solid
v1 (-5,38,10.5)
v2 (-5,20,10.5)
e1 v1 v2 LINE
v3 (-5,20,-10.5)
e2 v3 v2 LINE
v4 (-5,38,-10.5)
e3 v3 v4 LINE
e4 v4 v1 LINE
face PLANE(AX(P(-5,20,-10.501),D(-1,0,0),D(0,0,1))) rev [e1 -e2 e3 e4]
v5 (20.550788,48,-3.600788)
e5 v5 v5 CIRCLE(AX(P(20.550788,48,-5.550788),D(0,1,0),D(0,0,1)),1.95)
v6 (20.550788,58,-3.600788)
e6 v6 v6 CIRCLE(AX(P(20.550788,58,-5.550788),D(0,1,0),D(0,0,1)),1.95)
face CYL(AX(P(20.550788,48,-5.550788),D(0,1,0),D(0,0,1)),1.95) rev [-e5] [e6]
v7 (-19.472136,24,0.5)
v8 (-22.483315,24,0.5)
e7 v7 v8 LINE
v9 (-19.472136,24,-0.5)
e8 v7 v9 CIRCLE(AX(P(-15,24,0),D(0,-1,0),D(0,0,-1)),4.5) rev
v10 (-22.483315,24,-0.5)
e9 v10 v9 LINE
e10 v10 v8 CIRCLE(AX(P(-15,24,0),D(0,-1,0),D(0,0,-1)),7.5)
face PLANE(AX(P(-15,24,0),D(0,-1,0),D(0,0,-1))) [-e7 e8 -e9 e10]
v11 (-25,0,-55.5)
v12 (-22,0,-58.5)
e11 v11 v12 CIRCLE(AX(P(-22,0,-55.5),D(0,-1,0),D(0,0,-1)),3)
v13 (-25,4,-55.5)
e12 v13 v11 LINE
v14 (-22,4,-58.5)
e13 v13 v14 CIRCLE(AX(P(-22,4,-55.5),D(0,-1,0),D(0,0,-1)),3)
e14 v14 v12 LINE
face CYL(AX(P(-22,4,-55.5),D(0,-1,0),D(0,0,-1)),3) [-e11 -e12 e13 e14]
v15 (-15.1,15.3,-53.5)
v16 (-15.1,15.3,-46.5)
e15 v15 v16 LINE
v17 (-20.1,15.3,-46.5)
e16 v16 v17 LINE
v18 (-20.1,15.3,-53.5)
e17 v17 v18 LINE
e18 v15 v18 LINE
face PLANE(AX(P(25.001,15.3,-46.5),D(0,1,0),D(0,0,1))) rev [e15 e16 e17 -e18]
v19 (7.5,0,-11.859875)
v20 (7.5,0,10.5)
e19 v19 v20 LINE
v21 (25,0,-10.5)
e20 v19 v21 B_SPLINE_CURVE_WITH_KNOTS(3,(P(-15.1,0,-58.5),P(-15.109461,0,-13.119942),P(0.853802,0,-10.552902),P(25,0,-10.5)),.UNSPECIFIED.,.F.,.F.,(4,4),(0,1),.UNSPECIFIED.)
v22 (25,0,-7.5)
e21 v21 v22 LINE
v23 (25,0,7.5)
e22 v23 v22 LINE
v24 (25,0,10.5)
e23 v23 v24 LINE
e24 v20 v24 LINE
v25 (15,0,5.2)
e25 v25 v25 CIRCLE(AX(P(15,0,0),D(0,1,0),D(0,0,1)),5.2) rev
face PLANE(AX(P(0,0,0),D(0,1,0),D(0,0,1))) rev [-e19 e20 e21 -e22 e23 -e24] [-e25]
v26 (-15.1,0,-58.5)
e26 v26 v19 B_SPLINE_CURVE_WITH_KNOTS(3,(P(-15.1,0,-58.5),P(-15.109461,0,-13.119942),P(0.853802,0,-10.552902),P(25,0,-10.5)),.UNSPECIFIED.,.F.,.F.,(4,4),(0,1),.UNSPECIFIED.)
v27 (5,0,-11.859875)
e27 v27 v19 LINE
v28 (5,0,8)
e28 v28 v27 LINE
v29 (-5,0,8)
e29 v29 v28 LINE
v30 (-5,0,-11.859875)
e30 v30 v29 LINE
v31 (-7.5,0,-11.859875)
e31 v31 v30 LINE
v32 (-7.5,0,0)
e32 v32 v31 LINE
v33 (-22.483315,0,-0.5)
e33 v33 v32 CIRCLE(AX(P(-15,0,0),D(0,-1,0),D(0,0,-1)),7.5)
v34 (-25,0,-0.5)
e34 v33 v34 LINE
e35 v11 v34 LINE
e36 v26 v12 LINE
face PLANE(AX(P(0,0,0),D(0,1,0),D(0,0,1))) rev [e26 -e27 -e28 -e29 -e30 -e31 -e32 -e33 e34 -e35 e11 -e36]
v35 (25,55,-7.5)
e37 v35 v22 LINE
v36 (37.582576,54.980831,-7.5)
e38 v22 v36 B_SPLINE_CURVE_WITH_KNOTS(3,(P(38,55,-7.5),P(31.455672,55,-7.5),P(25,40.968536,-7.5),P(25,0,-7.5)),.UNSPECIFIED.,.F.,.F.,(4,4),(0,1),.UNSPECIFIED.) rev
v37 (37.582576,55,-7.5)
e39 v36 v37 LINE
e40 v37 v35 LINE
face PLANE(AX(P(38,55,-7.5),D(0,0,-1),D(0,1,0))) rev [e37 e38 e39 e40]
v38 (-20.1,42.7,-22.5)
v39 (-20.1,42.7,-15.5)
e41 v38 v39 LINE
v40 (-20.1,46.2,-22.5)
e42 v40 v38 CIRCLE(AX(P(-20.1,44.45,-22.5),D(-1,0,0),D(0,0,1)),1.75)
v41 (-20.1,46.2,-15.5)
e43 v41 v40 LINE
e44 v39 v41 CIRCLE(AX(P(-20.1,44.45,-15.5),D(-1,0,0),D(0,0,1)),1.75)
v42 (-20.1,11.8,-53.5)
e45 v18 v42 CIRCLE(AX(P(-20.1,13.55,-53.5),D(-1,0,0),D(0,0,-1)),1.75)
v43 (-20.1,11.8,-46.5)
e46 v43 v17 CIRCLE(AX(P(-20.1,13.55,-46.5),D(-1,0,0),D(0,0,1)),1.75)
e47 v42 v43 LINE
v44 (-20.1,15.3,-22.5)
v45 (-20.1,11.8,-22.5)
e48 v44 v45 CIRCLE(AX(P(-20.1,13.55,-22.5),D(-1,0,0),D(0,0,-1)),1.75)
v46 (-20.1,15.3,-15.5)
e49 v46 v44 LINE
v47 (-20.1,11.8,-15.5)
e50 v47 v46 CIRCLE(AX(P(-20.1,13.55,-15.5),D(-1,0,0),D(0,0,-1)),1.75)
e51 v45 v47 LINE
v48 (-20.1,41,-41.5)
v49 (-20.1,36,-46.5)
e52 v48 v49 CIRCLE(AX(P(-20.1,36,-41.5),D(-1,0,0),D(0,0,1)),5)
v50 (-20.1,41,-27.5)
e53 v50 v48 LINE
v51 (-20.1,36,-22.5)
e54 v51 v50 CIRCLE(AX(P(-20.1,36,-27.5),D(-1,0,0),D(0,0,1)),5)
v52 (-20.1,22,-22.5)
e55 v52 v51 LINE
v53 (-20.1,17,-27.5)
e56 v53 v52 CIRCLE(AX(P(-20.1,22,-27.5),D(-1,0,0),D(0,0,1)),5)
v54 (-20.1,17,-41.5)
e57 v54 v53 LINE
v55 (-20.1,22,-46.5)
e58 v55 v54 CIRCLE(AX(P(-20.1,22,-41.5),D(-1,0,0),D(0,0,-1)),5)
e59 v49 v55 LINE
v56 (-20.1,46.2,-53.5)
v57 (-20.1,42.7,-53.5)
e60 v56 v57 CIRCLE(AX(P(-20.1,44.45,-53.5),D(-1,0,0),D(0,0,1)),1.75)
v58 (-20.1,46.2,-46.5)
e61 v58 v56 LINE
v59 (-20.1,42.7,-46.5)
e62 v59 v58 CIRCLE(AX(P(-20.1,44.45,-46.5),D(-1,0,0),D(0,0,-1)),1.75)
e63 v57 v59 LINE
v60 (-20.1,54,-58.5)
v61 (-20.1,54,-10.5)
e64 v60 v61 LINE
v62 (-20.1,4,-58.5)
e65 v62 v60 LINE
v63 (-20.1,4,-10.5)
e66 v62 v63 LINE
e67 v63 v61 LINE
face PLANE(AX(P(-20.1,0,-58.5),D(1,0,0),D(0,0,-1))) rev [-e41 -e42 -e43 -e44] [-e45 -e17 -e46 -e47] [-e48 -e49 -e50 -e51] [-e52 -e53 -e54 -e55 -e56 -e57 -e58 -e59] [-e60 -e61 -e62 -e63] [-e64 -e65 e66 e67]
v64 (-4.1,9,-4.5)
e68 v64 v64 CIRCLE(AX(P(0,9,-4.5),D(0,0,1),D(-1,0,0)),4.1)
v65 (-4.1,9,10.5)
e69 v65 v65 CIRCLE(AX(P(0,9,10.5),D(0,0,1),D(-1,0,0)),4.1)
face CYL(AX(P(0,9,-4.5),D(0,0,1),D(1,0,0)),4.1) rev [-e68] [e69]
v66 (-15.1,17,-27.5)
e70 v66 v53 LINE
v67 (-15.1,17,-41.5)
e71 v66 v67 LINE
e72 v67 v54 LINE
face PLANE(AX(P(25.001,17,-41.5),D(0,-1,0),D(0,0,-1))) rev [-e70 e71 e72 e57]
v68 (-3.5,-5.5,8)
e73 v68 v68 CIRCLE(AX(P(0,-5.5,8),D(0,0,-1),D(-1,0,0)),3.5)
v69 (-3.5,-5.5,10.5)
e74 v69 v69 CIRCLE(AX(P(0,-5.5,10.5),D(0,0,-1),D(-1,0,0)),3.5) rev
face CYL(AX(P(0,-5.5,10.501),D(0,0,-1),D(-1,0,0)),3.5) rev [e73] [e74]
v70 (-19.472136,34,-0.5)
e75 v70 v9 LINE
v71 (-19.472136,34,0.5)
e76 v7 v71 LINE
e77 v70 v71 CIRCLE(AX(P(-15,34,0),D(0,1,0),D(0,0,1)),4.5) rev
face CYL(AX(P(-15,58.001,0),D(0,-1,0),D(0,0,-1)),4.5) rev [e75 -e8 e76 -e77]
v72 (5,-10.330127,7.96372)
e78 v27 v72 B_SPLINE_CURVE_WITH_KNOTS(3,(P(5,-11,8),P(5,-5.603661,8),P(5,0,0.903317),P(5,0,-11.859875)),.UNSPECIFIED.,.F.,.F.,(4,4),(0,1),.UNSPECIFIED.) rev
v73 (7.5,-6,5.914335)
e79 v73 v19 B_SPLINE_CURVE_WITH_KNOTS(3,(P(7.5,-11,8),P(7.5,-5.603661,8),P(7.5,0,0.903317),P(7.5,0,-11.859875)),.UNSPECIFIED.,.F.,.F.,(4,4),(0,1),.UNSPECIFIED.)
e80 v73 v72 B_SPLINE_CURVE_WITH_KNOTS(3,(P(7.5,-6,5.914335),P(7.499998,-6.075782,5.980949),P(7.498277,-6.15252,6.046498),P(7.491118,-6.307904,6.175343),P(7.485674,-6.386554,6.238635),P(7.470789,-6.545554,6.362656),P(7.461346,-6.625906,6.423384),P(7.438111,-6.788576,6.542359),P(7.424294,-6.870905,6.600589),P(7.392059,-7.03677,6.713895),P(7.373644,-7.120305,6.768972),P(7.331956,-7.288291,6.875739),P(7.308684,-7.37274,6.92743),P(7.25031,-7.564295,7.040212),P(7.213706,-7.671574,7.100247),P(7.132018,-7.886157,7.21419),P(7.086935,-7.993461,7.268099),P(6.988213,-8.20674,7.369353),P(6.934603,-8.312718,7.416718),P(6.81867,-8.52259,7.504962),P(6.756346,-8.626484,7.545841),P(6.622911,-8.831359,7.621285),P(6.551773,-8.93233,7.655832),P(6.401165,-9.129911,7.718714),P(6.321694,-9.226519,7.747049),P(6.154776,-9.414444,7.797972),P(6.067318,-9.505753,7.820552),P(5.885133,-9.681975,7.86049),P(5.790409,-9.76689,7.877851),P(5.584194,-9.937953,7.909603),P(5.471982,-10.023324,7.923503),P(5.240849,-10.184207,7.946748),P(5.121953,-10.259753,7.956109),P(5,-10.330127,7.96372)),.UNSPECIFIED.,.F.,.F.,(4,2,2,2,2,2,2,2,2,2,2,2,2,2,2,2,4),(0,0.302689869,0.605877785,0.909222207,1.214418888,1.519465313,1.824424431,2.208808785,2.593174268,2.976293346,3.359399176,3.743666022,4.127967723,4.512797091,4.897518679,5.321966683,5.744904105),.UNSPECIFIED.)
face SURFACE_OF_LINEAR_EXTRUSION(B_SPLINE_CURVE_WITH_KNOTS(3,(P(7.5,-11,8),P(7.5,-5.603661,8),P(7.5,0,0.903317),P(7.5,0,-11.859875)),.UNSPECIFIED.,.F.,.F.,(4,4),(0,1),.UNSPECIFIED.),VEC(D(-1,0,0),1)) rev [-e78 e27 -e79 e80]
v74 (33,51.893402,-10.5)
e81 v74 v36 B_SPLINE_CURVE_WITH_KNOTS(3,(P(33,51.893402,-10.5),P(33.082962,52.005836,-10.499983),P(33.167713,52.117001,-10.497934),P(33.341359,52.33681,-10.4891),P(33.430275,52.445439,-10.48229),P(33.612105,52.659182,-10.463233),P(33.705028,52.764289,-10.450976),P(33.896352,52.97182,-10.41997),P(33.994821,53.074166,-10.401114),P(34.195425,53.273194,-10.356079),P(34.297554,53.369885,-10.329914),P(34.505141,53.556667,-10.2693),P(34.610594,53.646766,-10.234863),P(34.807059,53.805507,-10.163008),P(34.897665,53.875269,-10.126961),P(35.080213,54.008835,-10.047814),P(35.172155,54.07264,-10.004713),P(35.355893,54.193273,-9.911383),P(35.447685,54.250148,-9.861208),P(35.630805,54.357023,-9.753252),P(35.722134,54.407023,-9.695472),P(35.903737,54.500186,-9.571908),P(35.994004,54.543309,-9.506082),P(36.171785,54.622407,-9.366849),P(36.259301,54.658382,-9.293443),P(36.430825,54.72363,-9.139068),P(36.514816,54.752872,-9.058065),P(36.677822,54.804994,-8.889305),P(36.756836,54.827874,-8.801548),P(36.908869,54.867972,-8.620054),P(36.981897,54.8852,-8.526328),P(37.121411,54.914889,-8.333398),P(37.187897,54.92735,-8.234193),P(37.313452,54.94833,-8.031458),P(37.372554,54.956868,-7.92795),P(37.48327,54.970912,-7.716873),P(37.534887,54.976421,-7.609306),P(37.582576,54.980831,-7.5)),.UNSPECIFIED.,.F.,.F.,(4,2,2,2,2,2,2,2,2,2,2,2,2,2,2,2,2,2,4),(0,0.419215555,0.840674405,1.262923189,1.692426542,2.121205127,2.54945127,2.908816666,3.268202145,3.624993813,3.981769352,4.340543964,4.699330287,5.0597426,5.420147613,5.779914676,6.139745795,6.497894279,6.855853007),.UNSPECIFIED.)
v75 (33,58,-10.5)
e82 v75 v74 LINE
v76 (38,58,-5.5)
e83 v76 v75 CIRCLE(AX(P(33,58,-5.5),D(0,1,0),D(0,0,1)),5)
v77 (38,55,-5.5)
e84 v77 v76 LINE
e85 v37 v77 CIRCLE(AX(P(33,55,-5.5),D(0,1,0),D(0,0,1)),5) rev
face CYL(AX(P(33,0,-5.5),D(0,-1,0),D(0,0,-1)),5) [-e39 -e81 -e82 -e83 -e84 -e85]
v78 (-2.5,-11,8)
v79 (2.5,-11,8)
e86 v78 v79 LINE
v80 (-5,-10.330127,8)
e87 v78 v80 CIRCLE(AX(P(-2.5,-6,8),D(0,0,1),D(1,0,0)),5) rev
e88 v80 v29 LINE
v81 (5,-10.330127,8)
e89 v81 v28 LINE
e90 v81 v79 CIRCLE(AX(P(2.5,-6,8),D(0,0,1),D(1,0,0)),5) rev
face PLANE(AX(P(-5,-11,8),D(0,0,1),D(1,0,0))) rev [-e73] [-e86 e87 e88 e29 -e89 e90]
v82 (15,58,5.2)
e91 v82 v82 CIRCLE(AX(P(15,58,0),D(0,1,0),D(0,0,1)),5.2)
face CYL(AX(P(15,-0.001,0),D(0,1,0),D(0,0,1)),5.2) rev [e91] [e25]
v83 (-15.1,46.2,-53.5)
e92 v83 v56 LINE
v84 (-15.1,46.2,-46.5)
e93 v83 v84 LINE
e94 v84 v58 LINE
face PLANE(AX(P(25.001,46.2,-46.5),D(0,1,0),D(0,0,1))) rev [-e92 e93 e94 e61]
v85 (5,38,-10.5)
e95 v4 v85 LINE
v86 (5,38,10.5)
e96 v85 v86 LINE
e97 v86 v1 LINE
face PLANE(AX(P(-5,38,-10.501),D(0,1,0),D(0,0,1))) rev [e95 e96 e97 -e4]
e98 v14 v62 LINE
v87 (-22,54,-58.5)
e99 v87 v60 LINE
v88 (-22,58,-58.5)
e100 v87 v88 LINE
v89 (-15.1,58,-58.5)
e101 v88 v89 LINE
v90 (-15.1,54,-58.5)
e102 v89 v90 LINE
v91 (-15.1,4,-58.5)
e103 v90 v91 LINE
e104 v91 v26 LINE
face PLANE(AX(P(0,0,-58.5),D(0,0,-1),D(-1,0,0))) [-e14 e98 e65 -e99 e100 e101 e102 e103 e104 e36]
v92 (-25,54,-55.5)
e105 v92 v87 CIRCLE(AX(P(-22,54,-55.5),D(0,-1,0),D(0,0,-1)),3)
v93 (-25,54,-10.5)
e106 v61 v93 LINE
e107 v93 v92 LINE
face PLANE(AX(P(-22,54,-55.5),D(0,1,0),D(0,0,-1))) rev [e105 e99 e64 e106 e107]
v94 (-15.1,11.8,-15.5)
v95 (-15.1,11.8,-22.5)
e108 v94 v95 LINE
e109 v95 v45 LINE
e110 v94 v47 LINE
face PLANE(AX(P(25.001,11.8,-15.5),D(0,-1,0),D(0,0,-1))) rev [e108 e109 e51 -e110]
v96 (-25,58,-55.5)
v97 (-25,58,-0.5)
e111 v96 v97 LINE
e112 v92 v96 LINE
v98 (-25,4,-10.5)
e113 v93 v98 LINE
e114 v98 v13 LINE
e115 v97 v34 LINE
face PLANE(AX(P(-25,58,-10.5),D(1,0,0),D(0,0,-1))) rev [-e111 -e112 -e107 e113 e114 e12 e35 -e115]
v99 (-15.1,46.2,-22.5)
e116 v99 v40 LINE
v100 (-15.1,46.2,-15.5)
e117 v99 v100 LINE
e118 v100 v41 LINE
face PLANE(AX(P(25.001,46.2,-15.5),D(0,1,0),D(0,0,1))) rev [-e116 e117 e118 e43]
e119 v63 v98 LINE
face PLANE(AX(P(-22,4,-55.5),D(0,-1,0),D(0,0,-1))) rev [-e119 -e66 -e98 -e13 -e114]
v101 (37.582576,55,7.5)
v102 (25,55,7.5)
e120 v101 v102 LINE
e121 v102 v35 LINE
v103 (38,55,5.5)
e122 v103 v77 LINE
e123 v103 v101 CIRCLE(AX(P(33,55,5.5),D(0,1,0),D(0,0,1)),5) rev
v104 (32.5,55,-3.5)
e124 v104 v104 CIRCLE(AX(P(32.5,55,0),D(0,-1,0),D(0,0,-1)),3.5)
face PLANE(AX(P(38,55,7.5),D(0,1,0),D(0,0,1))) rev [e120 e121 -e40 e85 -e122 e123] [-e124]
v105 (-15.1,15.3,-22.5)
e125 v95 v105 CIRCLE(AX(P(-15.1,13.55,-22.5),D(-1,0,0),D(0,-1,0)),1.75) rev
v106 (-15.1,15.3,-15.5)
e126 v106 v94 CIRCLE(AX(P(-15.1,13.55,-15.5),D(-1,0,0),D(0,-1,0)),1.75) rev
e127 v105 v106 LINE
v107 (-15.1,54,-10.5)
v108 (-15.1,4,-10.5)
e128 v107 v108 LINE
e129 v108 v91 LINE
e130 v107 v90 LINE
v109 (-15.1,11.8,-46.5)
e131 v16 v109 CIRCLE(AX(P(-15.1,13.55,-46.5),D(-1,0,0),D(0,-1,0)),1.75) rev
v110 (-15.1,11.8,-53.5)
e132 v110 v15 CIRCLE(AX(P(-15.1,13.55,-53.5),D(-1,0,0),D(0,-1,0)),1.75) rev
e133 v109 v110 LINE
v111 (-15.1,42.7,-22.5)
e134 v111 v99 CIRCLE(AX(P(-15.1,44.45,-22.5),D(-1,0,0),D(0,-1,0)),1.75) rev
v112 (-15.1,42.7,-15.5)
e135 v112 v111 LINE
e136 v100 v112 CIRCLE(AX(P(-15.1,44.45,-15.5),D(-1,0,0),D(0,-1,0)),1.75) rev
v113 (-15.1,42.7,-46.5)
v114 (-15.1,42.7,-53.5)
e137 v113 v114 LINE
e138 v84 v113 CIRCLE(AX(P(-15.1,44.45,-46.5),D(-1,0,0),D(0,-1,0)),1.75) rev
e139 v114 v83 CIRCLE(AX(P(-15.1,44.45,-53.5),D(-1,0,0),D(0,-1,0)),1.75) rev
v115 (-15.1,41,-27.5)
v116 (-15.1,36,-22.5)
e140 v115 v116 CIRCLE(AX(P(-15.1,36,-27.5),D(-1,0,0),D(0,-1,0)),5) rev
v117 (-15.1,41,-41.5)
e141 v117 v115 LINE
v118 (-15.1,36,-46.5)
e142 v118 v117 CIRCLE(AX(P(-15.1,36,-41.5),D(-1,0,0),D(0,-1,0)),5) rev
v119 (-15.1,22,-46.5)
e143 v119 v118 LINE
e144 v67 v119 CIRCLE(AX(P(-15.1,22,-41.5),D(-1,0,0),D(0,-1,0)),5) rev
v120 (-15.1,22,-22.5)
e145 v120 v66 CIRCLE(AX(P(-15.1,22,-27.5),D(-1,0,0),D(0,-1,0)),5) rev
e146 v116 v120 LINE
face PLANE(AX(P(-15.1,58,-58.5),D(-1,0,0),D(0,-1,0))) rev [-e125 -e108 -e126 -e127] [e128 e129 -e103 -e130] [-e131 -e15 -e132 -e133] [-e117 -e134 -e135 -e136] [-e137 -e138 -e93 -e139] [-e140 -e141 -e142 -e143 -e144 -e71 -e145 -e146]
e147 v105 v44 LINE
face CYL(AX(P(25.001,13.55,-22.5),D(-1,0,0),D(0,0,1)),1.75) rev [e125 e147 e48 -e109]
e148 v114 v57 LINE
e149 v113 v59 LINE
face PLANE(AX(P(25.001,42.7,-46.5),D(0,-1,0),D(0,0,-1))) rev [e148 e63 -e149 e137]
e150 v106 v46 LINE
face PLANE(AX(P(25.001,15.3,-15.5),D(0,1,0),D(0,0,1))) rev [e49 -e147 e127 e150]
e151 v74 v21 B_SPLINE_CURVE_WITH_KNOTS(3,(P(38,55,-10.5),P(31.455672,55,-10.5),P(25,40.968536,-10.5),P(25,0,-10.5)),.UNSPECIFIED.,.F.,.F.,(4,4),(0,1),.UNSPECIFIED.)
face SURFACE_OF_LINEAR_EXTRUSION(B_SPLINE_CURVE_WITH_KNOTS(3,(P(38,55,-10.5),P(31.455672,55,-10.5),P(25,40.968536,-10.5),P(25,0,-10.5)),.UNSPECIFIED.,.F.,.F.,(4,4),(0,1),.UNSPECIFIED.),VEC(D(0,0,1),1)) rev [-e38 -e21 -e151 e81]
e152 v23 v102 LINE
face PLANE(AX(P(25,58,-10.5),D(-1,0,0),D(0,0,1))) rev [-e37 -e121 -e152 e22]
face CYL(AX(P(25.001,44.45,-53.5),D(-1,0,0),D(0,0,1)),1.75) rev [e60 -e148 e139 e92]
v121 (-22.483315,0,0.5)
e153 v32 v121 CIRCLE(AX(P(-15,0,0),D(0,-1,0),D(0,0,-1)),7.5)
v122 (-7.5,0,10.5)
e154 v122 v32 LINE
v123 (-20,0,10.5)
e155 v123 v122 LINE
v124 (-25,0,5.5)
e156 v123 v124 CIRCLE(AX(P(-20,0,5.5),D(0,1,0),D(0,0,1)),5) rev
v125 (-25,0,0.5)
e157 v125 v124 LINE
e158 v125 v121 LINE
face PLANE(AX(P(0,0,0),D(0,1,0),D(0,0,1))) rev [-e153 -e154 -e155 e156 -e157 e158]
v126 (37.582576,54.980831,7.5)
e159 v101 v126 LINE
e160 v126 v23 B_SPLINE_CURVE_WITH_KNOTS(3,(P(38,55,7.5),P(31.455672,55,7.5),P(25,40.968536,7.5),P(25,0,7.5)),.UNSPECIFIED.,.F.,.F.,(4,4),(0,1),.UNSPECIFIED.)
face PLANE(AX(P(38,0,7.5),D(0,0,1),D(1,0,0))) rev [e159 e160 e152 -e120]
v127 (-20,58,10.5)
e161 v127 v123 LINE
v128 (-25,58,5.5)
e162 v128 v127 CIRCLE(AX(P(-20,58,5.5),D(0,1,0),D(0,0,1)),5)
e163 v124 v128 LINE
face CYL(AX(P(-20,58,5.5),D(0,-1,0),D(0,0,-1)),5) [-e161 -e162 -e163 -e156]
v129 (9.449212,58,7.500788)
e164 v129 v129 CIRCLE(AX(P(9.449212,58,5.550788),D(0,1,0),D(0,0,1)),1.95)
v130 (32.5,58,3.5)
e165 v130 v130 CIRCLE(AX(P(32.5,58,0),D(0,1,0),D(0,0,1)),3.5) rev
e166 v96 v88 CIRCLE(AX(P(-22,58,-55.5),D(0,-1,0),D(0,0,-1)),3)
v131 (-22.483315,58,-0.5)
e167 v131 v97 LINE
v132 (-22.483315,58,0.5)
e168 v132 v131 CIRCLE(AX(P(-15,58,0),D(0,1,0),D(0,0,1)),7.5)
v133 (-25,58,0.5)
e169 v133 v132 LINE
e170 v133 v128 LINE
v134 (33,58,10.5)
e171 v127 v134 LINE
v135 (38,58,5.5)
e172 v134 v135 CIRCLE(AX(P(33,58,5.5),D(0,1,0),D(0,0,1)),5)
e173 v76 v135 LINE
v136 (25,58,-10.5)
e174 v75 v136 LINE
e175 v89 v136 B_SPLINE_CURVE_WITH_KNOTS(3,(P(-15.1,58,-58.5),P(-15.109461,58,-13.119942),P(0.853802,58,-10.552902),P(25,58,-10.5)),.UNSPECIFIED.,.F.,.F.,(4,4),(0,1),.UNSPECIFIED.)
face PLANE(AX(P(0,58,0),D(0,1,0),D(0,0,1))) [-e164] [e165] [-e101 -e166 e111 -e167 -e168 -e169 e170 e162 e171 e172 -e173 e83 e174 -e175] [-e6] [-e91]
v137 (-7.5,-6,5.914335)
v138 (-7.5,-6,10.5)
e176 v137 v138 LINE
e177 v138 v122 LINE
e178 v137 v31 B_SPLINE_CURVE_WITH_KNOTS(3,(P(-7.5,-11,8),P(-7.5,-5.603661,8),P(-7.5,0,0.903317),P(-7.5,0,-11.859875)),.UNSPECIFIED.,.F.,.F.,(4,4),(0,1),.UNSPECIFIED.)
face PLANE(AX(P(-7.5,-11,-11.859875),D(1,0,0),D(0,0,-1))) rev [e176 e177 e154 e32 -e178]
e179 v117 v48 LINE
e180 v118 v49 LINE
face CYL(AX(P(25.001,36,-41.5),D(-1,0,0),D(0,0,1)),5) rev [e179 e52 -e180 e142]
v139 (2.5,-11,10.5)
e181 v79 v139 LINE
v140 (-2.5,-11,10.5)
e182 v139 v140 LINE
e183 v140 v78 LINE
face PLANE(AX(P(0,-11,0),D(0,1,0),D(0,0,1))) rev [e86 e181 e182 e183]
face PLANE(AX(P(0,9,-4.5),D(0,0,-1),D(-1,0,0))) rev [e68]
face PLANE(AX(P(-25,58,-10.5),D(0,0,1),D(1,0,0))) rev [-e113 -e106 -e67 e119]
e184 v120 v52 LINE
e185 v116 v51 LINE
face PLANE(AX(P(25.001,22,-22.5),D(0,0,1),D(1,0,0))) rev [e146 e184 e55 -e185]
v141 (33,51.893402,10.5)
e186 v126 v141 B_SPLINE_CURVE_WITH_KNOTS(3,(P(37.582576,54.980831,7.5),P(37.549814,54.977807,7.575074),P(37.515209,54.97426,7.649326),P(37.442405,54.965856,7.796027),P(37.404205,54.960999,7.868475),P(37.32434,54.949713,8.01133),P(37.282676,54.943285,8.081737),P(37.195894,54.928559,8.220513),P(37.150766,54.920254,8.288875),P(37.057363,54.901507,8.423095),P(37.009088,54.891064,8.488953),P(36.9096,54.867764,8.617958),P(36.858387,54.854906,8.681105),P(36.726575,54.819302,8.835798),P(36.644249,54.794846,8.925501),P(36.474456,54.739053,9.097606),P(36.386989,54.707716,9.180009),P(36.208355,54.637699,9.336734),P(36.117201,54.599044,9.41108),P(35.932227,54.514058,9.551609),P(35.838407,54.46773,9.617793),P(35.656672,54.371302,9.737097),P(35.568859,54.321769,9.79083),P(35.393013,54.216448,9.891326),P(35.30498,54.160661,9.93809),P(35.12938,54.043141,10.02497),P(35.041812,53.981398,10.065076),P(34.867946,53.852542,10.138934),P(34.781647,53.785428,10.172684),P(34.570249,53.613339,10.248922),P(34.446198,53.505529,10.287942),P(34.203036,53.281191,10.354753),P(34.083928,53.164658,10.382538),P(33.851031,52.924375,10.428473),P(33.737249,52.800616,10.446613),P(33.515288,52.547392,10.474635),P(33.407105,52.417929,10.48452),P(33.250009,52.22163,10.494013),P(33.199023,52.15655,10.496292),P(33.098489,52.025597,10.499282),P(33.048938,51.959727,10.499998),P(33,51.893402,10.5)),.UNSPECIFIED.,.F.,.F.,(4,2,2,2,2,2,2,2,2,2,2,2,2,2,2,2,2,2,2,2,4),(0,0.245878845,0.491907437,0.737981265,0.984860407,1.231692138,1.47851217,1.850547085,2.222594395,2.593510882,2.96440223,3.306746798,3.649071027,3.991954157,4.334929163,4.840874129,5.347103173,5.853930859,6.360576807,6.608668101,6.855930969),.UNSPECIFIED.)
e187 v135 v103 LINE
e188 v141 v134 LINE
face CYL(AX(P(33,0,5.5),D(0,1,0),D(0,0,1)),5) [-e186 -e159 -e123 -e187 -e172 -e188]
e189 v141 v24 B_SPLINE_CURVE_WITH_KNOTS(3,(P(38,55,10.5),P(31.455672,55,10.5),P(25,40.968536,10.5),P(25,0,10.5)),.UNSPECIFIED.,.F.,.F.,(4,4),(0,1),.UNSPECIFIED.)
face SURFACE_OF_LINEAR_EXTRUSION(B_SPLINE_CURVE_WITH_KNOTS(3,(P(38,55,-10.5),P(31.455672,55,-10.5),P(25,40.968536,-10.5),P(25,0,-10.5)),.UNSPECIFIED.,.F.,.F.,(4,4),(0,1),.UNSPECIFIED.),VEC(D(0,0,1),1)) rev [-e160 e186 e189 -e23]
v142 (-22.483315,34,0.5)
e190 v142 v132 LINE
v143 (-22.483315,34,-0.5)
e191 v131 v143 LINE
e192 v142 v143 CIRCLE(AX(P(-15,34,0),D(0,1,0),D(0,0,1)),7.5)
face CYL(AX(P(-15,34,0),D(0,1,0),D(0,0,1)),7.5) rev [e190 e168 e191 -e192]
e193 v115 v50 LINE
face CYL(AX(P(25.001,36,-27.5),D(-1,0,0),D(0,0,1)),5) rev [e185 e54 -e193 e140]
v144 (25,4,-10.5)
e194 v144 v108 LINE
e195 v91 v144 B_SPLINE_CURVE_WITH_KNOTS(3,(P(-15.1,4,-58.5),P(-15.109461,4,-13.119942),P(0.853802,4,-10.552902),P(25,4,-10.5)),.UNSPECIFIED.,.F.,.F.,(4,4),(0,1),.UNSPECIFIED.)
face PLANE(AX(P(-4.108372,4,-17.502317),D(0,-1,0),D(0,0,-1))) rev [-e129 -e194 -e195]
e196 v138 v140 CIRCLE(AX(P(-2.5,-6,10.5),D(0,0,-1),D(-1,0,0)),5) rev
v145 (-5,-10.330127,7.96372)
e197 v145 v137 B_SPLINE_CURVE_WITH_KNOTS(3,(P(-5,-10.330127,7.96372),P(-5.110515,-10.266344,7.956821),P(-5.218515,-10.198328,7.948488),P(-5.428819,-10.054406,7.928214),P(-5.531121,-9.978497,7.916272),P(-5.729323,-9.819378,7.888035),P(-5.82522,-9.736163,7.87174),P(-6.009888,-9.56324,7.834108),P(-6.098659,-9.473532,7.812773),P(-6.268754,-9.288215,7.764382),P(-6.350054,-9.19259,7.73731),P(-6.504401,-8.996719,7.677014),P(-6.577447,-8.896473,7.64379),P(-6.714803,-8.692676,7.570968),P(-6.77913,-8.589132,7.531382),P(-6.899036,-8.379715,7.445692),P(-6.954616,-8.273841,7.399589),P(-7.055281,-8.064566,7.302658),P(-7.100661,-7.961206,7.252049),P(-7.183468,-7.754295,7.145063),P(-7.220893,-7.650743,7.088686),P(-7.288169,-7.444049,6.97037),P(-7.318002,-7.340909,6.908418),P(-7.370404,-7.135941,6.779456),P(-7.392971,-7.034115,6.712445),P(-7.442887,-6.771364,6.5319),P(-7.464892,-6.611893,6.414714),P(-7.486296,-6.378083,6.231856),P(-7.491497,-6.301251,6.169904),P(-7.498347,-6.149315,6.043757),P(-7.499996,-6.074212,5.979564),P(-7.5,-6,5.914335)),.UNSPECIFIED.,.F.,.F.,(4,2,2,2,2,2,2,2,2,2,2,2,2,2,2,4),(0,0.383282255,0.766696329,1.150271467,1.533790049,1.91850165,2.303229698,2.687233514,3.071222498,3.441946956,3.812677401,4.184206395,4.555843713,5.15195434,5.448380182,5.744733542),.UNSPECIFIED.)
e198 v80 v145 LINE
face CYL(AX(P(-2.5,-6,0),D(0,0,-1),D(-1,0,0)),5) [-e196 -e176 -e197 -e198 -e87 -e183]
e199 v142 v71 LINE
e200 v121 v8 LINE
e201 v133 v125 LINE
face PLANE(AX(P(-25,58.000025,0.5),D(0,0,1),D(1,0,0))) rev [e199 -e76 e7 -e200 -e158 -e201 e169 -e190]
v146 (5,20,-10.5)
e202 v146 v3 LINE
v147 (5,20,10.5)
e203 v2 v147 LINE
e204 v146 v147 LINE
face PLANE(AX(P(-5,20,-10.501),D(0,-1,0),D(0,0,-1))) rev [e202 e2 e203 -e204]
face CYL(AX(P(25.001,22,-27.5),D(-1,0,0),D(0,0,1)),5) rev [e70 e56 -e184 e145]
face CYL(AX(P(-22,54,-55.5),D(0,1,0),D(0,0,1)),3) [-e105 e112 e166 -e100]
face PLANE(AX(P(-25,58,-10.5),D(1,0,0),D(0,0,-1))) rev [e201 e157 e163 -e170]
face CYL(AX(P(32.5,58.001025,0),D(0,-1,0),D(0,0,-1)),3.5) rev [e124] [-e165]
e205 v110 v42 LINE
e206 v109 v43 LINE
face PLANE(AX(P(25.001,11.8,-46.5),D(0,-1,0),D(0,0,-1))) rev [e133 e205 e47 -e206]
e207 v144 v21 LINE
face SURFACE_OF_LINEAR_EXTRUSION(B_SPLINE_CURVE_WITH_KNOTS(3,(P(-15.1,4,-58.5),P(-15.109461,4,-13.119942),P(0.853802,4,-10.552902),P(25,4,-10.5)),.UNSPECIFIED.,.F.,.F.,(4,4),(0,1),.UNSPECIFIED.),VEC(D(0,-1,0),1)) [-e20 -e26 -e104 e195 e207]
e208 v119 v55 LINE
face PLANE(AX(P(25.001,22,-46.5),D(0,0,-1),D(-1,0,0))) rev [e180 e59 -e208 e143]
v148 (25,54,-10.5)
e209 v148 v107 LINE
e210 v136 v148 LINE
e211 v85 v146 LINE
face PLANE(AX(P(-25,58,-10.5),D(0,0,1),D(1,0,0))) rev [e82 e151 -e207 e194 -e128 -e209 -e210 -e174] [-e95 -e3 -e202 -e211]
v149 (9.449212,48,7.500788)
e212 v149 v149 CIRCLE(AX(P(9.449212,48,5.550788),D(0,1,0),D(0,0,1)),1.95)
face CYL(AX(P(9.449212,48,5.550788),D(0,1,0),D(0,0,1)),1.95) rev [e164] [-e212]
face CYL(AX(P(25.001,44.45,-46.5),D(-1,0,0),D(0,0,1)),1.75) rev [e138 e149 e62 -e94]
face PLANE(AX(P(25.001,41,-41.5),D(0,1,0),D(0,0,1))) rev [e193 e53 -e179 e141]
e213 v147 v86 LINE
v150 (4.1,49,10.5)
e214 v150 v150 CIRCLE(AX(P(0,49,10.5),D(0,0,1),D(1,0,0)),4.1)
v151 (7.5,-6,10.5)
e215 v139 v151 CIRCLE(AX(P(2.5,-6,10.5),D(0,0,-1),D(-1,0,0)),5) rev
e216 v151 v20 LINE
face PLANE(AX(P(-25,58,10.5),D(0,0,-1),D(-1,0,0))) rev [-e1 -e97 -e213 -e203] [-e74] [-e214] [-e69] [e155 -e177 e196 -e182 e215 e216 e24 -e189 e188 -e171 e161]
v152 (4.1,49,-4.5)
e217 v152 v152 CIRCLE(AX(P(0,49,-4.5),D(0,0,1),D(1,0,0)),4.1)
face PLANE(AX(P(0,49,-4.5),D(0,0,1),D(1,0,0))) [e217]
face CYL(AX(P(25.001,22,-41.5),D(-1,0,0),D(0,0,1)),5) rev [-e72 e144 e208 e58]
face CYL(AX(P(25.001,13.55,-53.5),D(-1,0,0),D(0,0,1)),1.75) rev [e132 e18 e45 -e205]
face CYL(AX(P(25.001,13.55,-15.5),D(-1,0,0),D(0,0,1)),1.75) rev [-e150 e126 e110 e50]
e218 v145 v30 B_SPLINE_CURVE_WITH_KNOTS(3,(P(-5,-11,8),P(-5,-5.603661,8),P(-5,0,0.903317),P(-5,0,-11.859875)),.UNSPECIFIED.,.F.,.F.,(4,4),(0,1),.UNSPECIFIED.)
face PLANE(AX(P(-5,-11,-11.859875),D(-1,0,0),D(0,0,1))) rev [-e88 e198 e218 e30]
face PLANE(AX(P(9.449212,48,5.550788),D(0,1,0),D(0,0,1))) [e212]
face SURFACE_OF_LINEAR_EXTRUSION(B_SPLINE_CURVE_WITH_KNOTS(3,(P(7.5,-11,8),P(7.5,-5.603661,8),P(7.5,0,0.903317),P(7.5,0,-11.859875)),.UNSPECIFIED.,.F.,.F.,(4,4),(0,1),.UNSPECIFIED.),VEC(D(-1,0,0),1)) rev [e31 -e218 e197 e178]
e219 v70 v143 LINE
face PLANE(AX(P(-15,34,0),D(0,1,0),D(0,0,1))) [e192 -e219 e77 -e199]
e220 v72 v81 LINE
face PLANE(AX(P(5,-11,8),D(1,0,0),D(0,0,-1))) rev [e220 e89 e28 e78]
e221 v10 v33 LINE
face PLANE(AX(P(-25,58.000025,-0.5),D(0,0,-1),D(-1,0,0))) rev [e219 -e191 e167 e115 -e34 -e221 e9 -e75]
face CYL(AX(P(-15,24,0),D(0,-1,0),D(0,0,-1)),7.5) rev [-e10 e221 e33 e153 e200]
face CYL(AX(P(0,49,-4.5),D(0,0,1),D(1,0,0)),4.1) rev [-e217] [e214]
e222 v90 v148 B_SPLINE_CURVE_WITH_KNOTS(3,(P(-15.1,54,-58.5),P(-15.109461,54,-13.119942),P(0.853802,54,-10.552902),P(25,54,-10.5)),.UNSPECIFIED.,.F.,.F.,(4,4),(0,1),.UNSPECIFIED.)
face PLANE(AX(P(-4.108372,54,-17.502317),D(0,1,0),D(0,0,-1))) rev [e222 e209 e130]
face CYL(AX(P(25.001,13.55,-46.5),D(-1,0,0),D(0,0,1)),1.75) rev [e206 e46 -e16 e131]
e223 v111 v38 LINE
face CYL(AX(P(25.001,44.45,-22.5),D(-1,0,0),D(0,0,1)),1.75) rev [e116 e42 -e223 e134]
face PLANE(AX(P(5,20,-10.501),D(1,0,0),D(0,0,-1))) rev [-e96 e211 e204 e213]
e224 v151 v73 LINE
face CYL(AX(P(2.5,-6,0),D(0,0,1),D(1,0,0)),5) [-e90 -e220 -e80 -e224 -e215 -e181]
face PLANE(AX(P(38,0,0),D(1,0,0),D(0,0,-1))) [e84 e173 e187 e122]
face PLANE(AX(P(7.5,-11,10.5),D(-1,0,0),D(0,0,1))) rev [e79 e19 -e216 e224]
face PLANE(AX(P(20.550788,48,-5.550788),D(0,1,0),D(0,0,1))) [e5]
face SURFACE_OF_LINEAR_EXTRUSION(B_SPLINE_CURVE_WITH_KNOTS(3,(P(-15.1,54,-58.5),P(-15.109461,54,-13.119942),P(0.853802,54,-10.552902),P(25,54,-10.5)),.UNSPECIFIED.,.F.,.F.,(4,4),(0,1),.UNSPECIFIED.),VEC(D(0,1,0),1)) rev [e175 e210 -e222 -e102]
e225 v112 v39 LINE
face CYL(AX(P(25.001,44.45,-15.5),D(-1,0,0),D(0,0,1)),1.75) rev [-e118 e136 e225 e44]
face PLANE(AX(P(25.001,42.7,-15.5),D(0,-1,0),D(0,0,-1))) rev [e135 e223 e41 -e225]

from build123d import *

# Parameters (mm, degrees)
SKETCH1_W                = 50
SKETCH1_H                = 21
BOSS_EXTRUDE1_DEPTH      = 58
SKETCH3_R                = 7.5
CUT_EXTRUDE1_DEPTH       = 24
CUT_EXTRUDE2_REACH       = 66.025
SKETCH4_R                = 5.2
CUT_EXTRUDE3_START       = -24
SKETCH5_R                = 7.5
CUT_EXTRUDE3_DEPTH       = 24
CUT_EXTRUDE4_REACH       = 66.025
SKETCH6_R                = 4.5
CUT_EXTRUDE5_REACH       = 68.558
SKETCH8_W                = 10
SKETCH8_H                = 18
SKETCH9_W                = 5
SKETCH9_H                = 58
BOSS_EXTRUDE3_DEPTH      = 48
CUT_EXTRUDE7_REACH       = 95.916
BOSS_EXTRUDE4_START      = -25
BOSS_EXTRUDE4_OUTLINE_W  = 4
BOSS_EXTRUDE4_OUTLINE_H  = 48
BOSS_EXTRUDE4_DEPTH      = 50.0000001
BOSS_EXTRUDE4_2_DEPTH    = 4
SKETCH7_R                = 4.1
CUT_EXTRUDE8_DEPTH       = 15
SKETCH19_R               = 1.95
CUT_EXTRUDE11_DEPTH      = 10
CUT_EXTRUDE12_DEPTH      = 87.088617327
CUT_EXTRUDE12_DEPTH_BACK = 87.088617327
SKETCH20_W               = 5.527864045
SKETCH20_H               = 1
BOSS_EXTRUDE5_DEPTH      = 13
CUT_EXTRUDE13_START      = -69
CUT_EXTRUDE13_DEPTH      = 69
CUT_EXTRUDE14_REACH      = 90.833
SKETCH23_R               = 3.5
BOSS_EXTRUDE7_DEPTH      = 11
CUT_EXTRUDE15_REACH      = 98.074
SKETCH26_R               = 3.5
CUT_EXTRUDE16_DEPTH      = 15
FILLET1_R                = 5


with BuildPart() as part:
    # Sketch1 → Boss-Extrude1 (new body)
    with BuildSketch(Plane(origin=(0, 0, 0), x_dir=(1, 0, 0), z_dir=(0, 1, 0))):
        Rectangle(SKETCH1_W, SKETCH1_H)
    extrude(amount=BOSS_EXTRUDE1_DEPTH)

    # Sketch3 → Cut-Extrude1 (cut)
    with BuildSketch(Plane(origin=(0, 58, 0), x_dir=(1, 0, 0), z_dir=(0, 1, 0))):
        with Locations(Location((-15, 0, 0), (0, 0, 270))):
            Circle(SKETCH3_R)
    extrude(amount=-CUT_EXTRUDE1_DEPTH, mode=Mode.SUBTRACT)

    # Sketch4 → Cut-Extrude2 (cut, up to next)
    with BuildSketch(Plane(origin=(0, 58, 0), x_dir=(1, 0, 0), z_dir=(0, 1, 0)), mode=Mode.PRIVATE) as cut_extrude2_sk1:
        with Locations(Location((15, 0, 0), (0, 0, 270))):
            Circle(SKETCH4_R)
    cut_extrude2_tool1 = extrude(cut_extrude2_sk1.sketch, amount=-CUT_EXTRUDE2_REACH, mode=Mode.PRIVATE) & part.part
    add(cut_extrude2_tool1.solids().sort_by_distance((15, 58, 0))[0], mode=Mode.SUBTRACT)

    # Sketch5 → Cut-Extrude3 (cut)
    with BuildSketch(Plane.XZ.offset(CUT_EXTRUDE3_START)):
        with Locations(Location((-15, 0, 0), (0, 0, 90))):
            Circle(SKETCH5_R)
    extrude(amount=CUT_EXTRUDE3_DEPTH, mode=Mode.SUBTRACT)

    # Sketch6 → Cut-Extrude4 (cut, up to next)
    with BuildSketch(Plane.XZ, mode=Mode.PRIVATE) as cut_extrude4_sk1:
        with Locations(Location((-15, 0, 0), (0, 0, 270))):
            Circle(SKETCH6_R)
    cut_extrude4_tool1 = extrude(cut_extrude4_sk1.sketch, amount=-CUT_EXTRUDE4_REACH, mode=Mode.PRIVATE) & part.part
    add(cut_extrude4_tool1.solids().sort_by_distance((-15, 0, 0))[0], mode=Mode.SUBTRACT)

    # Sketch8 → Cut-Extrude5 (cut, up to next)
    with BuildSketch(Plane.XY.offset(10.5), mode=Mode.PRIVATE) as cut_extrude5_sk1:
        with Locations((0, 29)):
            Rectangle(SKETCH8_W, SKETCH8_H)
    cut_extrude5_tool1 = extrude(cut_extrude5_sk1.sketch, amount=-CUT_EXTRUDE5_REACH, mode=Mode.PRIVATE) & part.part
    add(cut_extrude5_tool1.solids().sort_by_distance((0, 29, 10.5))[0], mode=Mode.SUBTRACT)

    # Sketch9 → Boss-Extrude3 (add)
    with BuildSketch(Plane(origin=(0, 0, -10.5), x_dir=(-1, 0, 0), z_dir=(0, 0, -1))):
        with Locations((17.6, 29)):
            Rectangle(SKETCH9_W, SKETCH9_H)
    extrude(amount=BOSS_EXTRUDE3_DEPTH)

    # Sketch10 → Cut-Extrude7 (cut, up to next)
    with BuildSketch(Plane.ZY.offset(20.1), mode=Mode.PRIVATE) as cut_extrude7_sk1:
        with BuildLine():
            Line((-46.5, 46.2), (-53.5, 46.2))
            ThreePointArc((-53.5, 46.2), (-55.25, 44.45), (-53.5, 42.7))
            Line((-53.5, 42.7), (-46.5, 42.7))
            ThreePointArc((-46.5, 42.7), (-44.75, 44.45), (-46.5, 46.2))
        make_face()
    cut_extrude7_tool1 = extrude(cut_extrude7_sk1.sketch, amount=-CUT_EXTRUDE7_REACH, mode=Mode.PRIVATE) & part.part
    # Sketch10 → Cut-Extrude7 (cut, up to next)
    with BuildSketch(Plane.ZY.offset(20.1), mode=Mode.PRIVATE) as cut_extrude7_sk2:
        with BuildLine():
            Line((-41.5, 17), (-27.5, 17))
            ThreePointArc((-27.5, 17), (-23.964466094, 18.464466094), (-22.5, 22))
            Line((-22.5, 22), (-22.5, 36))
            ThreePointArc((-22.5, 36), (-23.964466094, 39.535533906), (-27.5, 41))
            Line((-27.5, 41), (-41.5, 41))
            ThreePointArc((-41.5, 41), (-45.035533906, 39.535533906), (-46.5, 36))
            Line((-46.5, 36), (-46.5, 22))
            ThreePointArc((-46.5, 22), (-45.035533906, 18.464466094), (-41.5, 17))
        make_face()
    cut_extrude7_tool2 = extrude(cut_extrude7_sk2.sketch, amount=-CUT_EXTRUDE7_REACH, mode=Mode.PRIVATE) & part.part
    # Sketch10 → Cut-Extrude7 (cut, up to next)
    with BuildSketch(Plane.ZY.offset(20.1), mode=Mode.PRIVATE) as cut_extrude7_sk3:
        with BuildLine():
            Line((-15.5, 15.3), (-22.5, 15.3))
            ThreePointArc((-22.5, 15.3), (-24.25, 13.55), (-22.5, 11.8))
            Line((-22.5, 11.8), (-15.5, 11.8))
            ThreePointArc((-15.5, 11.8), (-13.75, 13.55), (-15.5, 15.3))
        make_face()
    cut_extrude7_tool3 = extrude(cut_extrude7_sk3.sketch, amount=-CUT_EXTRUDE7_REACH, mode=Mode.PRIVATE) & part.part
    # Sketch10 → Cut-Extrude7 (cut, up to next)
    with BuildSketch(Plane.ZY.offset(20.1), mode=Mode.PRIVATE) as cut_extrude7_sk4:
        with BuildLine():
            Line((-46.5, 11.8), (-53.5, 11.8))
            ThreePointArc((-53.5, 11.8), (-55.25, 13.55), (-53.5, 15.3))
            Line((-53.5, 15.3), (-46.5, 15.3))
            ThreePointArc((-46.5, 15.3), (-44.75, 13.55), (-46.5, 11.8))
        make_face()
    cut_extrude7_tool4 = extrude(cut_extrude7_sk4.sketch, amount=-CUT_EXTRUDE7_REACH, mode=Mode.PRIVATE) & part.part
    # Sketch10 → Cut-Extrude7 (cut, up to next)
    with BuildSketch(Plane.ZY.offset(20.1), mode=Mode.PRIVATE) as cut_extrude7_sk5:
        with BuildLine():
            Line((-15.5, 46.2), (-22.5, 46.2))
            ThreePointArc((-22.5, 46.2), (-24.25, 44.45), (-22.5, 42.7))
            Line((-22.5, 42.7), (-15.5, 42.7))
            ThreePointArc((-15.5, 42.7), (-13.75, 44.45), (-15.5, 46.2))
        make_face()
    cut_extrude7_tool5 = extrude(cut_extrude7_sk5.sketch, amount=-CUT_EXTRUDE7_REACH, mode=Mode.PRIVATE) & part.part
    add(cut_extrude7_tool1.solids().sort_by_distance((-20.1, 44.45, -50))[0], mode=Mode.SUBTRACT)
    add(cut_extrude7_tool2.solids().sort_by_distance((-20.1, 29, -34.5))[0], mode=Mode.SUBTRACT)
    add(cut_extrude7_tool3.solids().sort_by_distance((-20.1, 13.55, -19))[0], mode=Mode.SUBTRACT)
    add(cut_extrude7_tool4.solids().sort_by_distance((-20.1, 13.55, -50))[0], mode=Mode.SUBTRACT)
    add(cut_extrude7_tool5.solids().sort_by_distance((-20.1, 44.45, -19))[0], mode=Mode.SUBTRACT)

    # Boss-Extrude4: read off the stored shape, not the designer's step
    # Boss-Extrude4 outline → Boss-Extrude4 (add)
    with BuildSketch(Plane.YZ.offset(BOSS_EXTRUDE4_START)):
        with Locations((2, -34.5)):
            Rectangle(BOSS_EXTRUDE4_OUTLINE_W, BOSS_EXTRUDE4_OUTLINE_H)
    boss_extrude4 = extrude(amount=BOSS_EXTRUDE4_DEPTH)

    # Boss-Extrude4 2 outline → Boss-Extrude4 2 (cut)
    with BuildSketch(Plane(origin=(0, 0, 0), x_dir=(1, 0, 0), z_dir=(0, 1, 0))):
        with BuildLine():
            Line((25.0000001, 58.5), (-15.1, 58.5))
            add(Edge.make_bspline(
                [(-15.1, 58.5), (-15.109460691, 13.119942058), (0.853801952, 10.552902486), (25, 10.5)],
                knots=[0, 0, 0, 0, 1, 1, 1, 1], degree=3))
            Line((25, 10.5), (25.0000001, 58.5))
        make_face()
        with BuildLine():
            ThreePointArc((-25, 55.5), (-24.121320344, 57.621320344), (-22, 58.5))
            Line((-22, 58.5), (-25, 58.5))
            Line((-25, 58.5), (-25, 55.5))
        make_face()
    boss_extrude4_2 = extrude(amount=BOSS_EXTRUDE4_2_DEPTH, mode=Mode.SUBTRACT)

    # Mirror1: Boss-Extrude4, Boss-Extrude4 2 across plane
    add(boss_extrude4.mirror(Plane(origin=(0, 29, 0), x_dir=(0, 0, 1), z_dir=(0, -1, 0))))
    add(boss_extrude4_2.mirror(Plane(origin=(0, 29, 0), x_dir=(0, 0, 1), z_dir=(0, -1, 0))), mode=Mode.SUBTRACT)

    # Sketch7 → Cut-Extrude8 (cut)
    with BuildSketch(Plane.XY.offset(10.5)):
        with Locations((0, 49)):
            Circle(SKETCH7_R)
        with Locations(Location((0, 9, 0), (0, 0, 180))):
            Circle(SKETCH7_R)
    extrude(amount=-CUT_EXTRUDE8_DEPTH, mode=Mode.SUBTRACT)

    # Sketch19 → Cut-Extrude11 (cut)
    with BuildSketch(Plane(origin=(0, 58, 0), x_dir=(1, 0, 0), z_dir=(0, 1, 0))):
        with Locations(Location((20.550788232, 5.550788232, 0), (0, 0, 270))):
            Circle(SKETCH19_R)
        with Locations(Location((9.449211768, -5.550788232, 0), (0, 0, 270))):
            Circle(SKETCH19_R)
    extrude(amount=-CUT_EXTRUDE11_DEPTH, mode=Mode.SUBTRACT)

    # Sketch20 → Cut-Extrude12 (cut, two sides: drawn at the far end of the back side and taken through both)
    with BuildSketch(Plane.XZ.offset(-CUT_EXTRUDE12_DEPTH_BACK)):
        with Locations((-22.236067977, 0)):
            Rectangle(SKETCH20_W, SKETCH20_H)
    extrude(amount=CUT_EXTRUDE12_DEPTH + CUT_EXTRUDE12_DEPTH_BACK, mode=Mode.SUBTRACT)

    # Sketch21 → Boss-Extrude5 (add)
    with BuildSketch(Plane(origin=(25, 0, 0), x_dir=(0, 0, -1), z_dir=(1, 0, 0))):
        Polygon((10.5, 0), (10.5, 58), (-10.5, 58), (-10.5, 0), (-7.5, 0), (-7.5, 55), (7.5, 55), (7.5, 0), align=None)
    extrude(amount=BOSS_EXTRUDE5_DEPTH)

    # Sketch22 → Cut-Extrude13 (cut)
    with BuildSketch(Plane.XY.offset(10.5).offset(CUT_EXTRUDE13_START)):
        with BuildLine():
            Line((25, 0), (38, 0))
            Line((38, 0), (38, 55))
            add(Edge.make_bspline(
                [(38, 55), (31.45567161, 55), (25, 40.968536323), (25, 0)],
                knots=[0, 0, 0, 0, 1, 1, 1, 1], degree=3))
        make_face()
    extrude(amount=CUT_EXTRUDE13_DEPTH, mode=Mode.SUBTRACT)

    # Sketch23 → Cut-Extrude14 (cut, up to next)
    with BuildSketch(Plane.XZ.offset(-55), mode=Mode.PRIVATE) as cut_extrude14_sk1:
        with Locations(Location((32.5, 0, 0), (0, 0, 270))):
            Circle(SKETCH23_R)
    cut_extrude14_tool1 = extrude(cut_extrude14_sk1.sketch, amount=-CUT_EXTRUDE14_REACH, mode=Mode.PRIVATE) & part.part
    add(cut_extrude14_tool1.solids().sort_by_distance((32.5, 55, 0))[0], mode=Mode.SUBTRACT)

    # Sketch24 → Boss-Extrude7 (add)
    with BuildSketch(Plane.XZ):
        Polygon((7.5, 10.5), (7.5, -11.859875449), (5, -11.859875449), (5, 8), (-5, 8), (-5, -11.859875449), (-7.5, -11.859875449), (-7.5, 10.5), align=None)
    extrude(amount=BOSS_EXTRUDE7_DEPTH)

    # Sketch26 → Cut-Extrude15 (cut, up to next)
    with BuildSketch(Plane(origin=(0, 0, 8), x_dir=(-1, 0, 0), z_dir=(0, 0, -1)), mode=Mode.PRIVATE) as cut_extrude15_sk1:
        with Locations((0, -5.5)):
            Circle(SKETCH26_R)
    cut_extrude15_tool1 = extrude(cut_extrude15_sk1.sketch, amount=-CUT_EXTRUDE15_REACH, mode=Mode.PRIVATE) & part.part
    add(cut_extrude15_tool1.solids().sort_by_distance((0, -5.5, 8))[0], mode=Mode.SUBTRACT)

    # Sketch27 → Cut-Extrude16 (cut)
    with BuildSketch(Plane.ZY.offset(7.5)):
        with BuildLine():
            Line((8, -11), (-11.859875449, -11))
            Line((-11.859875449, -11), (-11.859875449, 0))
            add(Edge.make_bspline(
                [(8, -11), (8, -5.603660731), (0.903317246, 0), (-11.859875449, 0)],
                knots=[0, 0, 0, 0, 1, 1, 1, 1], degree=3))
        make_face()
    extrude(amount=-CUT_EXTRUDE16_DEPTH, mode=Mode.SUBTRACT)

    # Fillet1
    # the kernel refuses this fillet: 5 mm, written as the material it takes off along each edge
    with BuildSketch(Plane(origin=(-25, -12.5, 10.5), x_dir=(1, 0, 0), z_dir=(0, 1, 0))) as fillet1_piece_1:
        with BuildLine():
            CenterArc((FILLET1_R, FILLET1_R), FILLET1_R, 180, 90)
            Line((0, FILLET1_R), (0, 0))
            Line((0, 0), (FILLET1_R, 0))
        make_face()
    extrude(amount=83, mode=Mode.SUBTRACT)
    with BuildSketch(Plane(origin=(38, 70.5, 10.5), x_dir=(-1, 0, 0), z_dir=(0, -1, 0)), Plane(origin=(38, 42.5, -10.5), x_dir=(-1, 0, 0), z_dir=(0, 1, 0))) as fillet1_piece_2:
        with BuildLine():
            CenterArc((FILLET1_R, FILLET1_R), FILLET1_R, 180, 90)
            Line((0, FILLET1_R), (0, 0))
            Line((0, 0), (FILLET1_R, 0))
        make_face()
    extrude(amount=28, mode=Mode.SUBTRACT)
    with BuildSketch(Plane(origin=(-7.5, -11, -4.5), x_dir=(1, 0, 0), z_dir=(0, 0, 1))) as fillet1_piece_3:
        with BuildLine():
            CenterArc((FILLET1_R, FILLET1_R), FILLET1_R, 180, 90)
            Line((0, FILLET1_R), (0, 0))
            Line((0, 0), (FILLET1_R, 0))
        make_face()
    extrude(amount=27.5, mode=Mode.SUBTRACT)
    with BuildSketch(Plane(origin=(7.5, -11, 23), x_dir=(0, 1, 0), z_dir=(0, 0, -1))) as fillet1_piece_4:
        with BuildLine():
            CenterArc((FILLET1_R, -FILLET1_R), FILLET1_R, 90, 90)
            Line((0, -FILLET1_R), (0, 0))
            Line((0, 0), (FILLET1_R, 0))
        make_face()
    extrude(amount=27.5, mode=Mode.SUBTRACT)


solid = part.part
